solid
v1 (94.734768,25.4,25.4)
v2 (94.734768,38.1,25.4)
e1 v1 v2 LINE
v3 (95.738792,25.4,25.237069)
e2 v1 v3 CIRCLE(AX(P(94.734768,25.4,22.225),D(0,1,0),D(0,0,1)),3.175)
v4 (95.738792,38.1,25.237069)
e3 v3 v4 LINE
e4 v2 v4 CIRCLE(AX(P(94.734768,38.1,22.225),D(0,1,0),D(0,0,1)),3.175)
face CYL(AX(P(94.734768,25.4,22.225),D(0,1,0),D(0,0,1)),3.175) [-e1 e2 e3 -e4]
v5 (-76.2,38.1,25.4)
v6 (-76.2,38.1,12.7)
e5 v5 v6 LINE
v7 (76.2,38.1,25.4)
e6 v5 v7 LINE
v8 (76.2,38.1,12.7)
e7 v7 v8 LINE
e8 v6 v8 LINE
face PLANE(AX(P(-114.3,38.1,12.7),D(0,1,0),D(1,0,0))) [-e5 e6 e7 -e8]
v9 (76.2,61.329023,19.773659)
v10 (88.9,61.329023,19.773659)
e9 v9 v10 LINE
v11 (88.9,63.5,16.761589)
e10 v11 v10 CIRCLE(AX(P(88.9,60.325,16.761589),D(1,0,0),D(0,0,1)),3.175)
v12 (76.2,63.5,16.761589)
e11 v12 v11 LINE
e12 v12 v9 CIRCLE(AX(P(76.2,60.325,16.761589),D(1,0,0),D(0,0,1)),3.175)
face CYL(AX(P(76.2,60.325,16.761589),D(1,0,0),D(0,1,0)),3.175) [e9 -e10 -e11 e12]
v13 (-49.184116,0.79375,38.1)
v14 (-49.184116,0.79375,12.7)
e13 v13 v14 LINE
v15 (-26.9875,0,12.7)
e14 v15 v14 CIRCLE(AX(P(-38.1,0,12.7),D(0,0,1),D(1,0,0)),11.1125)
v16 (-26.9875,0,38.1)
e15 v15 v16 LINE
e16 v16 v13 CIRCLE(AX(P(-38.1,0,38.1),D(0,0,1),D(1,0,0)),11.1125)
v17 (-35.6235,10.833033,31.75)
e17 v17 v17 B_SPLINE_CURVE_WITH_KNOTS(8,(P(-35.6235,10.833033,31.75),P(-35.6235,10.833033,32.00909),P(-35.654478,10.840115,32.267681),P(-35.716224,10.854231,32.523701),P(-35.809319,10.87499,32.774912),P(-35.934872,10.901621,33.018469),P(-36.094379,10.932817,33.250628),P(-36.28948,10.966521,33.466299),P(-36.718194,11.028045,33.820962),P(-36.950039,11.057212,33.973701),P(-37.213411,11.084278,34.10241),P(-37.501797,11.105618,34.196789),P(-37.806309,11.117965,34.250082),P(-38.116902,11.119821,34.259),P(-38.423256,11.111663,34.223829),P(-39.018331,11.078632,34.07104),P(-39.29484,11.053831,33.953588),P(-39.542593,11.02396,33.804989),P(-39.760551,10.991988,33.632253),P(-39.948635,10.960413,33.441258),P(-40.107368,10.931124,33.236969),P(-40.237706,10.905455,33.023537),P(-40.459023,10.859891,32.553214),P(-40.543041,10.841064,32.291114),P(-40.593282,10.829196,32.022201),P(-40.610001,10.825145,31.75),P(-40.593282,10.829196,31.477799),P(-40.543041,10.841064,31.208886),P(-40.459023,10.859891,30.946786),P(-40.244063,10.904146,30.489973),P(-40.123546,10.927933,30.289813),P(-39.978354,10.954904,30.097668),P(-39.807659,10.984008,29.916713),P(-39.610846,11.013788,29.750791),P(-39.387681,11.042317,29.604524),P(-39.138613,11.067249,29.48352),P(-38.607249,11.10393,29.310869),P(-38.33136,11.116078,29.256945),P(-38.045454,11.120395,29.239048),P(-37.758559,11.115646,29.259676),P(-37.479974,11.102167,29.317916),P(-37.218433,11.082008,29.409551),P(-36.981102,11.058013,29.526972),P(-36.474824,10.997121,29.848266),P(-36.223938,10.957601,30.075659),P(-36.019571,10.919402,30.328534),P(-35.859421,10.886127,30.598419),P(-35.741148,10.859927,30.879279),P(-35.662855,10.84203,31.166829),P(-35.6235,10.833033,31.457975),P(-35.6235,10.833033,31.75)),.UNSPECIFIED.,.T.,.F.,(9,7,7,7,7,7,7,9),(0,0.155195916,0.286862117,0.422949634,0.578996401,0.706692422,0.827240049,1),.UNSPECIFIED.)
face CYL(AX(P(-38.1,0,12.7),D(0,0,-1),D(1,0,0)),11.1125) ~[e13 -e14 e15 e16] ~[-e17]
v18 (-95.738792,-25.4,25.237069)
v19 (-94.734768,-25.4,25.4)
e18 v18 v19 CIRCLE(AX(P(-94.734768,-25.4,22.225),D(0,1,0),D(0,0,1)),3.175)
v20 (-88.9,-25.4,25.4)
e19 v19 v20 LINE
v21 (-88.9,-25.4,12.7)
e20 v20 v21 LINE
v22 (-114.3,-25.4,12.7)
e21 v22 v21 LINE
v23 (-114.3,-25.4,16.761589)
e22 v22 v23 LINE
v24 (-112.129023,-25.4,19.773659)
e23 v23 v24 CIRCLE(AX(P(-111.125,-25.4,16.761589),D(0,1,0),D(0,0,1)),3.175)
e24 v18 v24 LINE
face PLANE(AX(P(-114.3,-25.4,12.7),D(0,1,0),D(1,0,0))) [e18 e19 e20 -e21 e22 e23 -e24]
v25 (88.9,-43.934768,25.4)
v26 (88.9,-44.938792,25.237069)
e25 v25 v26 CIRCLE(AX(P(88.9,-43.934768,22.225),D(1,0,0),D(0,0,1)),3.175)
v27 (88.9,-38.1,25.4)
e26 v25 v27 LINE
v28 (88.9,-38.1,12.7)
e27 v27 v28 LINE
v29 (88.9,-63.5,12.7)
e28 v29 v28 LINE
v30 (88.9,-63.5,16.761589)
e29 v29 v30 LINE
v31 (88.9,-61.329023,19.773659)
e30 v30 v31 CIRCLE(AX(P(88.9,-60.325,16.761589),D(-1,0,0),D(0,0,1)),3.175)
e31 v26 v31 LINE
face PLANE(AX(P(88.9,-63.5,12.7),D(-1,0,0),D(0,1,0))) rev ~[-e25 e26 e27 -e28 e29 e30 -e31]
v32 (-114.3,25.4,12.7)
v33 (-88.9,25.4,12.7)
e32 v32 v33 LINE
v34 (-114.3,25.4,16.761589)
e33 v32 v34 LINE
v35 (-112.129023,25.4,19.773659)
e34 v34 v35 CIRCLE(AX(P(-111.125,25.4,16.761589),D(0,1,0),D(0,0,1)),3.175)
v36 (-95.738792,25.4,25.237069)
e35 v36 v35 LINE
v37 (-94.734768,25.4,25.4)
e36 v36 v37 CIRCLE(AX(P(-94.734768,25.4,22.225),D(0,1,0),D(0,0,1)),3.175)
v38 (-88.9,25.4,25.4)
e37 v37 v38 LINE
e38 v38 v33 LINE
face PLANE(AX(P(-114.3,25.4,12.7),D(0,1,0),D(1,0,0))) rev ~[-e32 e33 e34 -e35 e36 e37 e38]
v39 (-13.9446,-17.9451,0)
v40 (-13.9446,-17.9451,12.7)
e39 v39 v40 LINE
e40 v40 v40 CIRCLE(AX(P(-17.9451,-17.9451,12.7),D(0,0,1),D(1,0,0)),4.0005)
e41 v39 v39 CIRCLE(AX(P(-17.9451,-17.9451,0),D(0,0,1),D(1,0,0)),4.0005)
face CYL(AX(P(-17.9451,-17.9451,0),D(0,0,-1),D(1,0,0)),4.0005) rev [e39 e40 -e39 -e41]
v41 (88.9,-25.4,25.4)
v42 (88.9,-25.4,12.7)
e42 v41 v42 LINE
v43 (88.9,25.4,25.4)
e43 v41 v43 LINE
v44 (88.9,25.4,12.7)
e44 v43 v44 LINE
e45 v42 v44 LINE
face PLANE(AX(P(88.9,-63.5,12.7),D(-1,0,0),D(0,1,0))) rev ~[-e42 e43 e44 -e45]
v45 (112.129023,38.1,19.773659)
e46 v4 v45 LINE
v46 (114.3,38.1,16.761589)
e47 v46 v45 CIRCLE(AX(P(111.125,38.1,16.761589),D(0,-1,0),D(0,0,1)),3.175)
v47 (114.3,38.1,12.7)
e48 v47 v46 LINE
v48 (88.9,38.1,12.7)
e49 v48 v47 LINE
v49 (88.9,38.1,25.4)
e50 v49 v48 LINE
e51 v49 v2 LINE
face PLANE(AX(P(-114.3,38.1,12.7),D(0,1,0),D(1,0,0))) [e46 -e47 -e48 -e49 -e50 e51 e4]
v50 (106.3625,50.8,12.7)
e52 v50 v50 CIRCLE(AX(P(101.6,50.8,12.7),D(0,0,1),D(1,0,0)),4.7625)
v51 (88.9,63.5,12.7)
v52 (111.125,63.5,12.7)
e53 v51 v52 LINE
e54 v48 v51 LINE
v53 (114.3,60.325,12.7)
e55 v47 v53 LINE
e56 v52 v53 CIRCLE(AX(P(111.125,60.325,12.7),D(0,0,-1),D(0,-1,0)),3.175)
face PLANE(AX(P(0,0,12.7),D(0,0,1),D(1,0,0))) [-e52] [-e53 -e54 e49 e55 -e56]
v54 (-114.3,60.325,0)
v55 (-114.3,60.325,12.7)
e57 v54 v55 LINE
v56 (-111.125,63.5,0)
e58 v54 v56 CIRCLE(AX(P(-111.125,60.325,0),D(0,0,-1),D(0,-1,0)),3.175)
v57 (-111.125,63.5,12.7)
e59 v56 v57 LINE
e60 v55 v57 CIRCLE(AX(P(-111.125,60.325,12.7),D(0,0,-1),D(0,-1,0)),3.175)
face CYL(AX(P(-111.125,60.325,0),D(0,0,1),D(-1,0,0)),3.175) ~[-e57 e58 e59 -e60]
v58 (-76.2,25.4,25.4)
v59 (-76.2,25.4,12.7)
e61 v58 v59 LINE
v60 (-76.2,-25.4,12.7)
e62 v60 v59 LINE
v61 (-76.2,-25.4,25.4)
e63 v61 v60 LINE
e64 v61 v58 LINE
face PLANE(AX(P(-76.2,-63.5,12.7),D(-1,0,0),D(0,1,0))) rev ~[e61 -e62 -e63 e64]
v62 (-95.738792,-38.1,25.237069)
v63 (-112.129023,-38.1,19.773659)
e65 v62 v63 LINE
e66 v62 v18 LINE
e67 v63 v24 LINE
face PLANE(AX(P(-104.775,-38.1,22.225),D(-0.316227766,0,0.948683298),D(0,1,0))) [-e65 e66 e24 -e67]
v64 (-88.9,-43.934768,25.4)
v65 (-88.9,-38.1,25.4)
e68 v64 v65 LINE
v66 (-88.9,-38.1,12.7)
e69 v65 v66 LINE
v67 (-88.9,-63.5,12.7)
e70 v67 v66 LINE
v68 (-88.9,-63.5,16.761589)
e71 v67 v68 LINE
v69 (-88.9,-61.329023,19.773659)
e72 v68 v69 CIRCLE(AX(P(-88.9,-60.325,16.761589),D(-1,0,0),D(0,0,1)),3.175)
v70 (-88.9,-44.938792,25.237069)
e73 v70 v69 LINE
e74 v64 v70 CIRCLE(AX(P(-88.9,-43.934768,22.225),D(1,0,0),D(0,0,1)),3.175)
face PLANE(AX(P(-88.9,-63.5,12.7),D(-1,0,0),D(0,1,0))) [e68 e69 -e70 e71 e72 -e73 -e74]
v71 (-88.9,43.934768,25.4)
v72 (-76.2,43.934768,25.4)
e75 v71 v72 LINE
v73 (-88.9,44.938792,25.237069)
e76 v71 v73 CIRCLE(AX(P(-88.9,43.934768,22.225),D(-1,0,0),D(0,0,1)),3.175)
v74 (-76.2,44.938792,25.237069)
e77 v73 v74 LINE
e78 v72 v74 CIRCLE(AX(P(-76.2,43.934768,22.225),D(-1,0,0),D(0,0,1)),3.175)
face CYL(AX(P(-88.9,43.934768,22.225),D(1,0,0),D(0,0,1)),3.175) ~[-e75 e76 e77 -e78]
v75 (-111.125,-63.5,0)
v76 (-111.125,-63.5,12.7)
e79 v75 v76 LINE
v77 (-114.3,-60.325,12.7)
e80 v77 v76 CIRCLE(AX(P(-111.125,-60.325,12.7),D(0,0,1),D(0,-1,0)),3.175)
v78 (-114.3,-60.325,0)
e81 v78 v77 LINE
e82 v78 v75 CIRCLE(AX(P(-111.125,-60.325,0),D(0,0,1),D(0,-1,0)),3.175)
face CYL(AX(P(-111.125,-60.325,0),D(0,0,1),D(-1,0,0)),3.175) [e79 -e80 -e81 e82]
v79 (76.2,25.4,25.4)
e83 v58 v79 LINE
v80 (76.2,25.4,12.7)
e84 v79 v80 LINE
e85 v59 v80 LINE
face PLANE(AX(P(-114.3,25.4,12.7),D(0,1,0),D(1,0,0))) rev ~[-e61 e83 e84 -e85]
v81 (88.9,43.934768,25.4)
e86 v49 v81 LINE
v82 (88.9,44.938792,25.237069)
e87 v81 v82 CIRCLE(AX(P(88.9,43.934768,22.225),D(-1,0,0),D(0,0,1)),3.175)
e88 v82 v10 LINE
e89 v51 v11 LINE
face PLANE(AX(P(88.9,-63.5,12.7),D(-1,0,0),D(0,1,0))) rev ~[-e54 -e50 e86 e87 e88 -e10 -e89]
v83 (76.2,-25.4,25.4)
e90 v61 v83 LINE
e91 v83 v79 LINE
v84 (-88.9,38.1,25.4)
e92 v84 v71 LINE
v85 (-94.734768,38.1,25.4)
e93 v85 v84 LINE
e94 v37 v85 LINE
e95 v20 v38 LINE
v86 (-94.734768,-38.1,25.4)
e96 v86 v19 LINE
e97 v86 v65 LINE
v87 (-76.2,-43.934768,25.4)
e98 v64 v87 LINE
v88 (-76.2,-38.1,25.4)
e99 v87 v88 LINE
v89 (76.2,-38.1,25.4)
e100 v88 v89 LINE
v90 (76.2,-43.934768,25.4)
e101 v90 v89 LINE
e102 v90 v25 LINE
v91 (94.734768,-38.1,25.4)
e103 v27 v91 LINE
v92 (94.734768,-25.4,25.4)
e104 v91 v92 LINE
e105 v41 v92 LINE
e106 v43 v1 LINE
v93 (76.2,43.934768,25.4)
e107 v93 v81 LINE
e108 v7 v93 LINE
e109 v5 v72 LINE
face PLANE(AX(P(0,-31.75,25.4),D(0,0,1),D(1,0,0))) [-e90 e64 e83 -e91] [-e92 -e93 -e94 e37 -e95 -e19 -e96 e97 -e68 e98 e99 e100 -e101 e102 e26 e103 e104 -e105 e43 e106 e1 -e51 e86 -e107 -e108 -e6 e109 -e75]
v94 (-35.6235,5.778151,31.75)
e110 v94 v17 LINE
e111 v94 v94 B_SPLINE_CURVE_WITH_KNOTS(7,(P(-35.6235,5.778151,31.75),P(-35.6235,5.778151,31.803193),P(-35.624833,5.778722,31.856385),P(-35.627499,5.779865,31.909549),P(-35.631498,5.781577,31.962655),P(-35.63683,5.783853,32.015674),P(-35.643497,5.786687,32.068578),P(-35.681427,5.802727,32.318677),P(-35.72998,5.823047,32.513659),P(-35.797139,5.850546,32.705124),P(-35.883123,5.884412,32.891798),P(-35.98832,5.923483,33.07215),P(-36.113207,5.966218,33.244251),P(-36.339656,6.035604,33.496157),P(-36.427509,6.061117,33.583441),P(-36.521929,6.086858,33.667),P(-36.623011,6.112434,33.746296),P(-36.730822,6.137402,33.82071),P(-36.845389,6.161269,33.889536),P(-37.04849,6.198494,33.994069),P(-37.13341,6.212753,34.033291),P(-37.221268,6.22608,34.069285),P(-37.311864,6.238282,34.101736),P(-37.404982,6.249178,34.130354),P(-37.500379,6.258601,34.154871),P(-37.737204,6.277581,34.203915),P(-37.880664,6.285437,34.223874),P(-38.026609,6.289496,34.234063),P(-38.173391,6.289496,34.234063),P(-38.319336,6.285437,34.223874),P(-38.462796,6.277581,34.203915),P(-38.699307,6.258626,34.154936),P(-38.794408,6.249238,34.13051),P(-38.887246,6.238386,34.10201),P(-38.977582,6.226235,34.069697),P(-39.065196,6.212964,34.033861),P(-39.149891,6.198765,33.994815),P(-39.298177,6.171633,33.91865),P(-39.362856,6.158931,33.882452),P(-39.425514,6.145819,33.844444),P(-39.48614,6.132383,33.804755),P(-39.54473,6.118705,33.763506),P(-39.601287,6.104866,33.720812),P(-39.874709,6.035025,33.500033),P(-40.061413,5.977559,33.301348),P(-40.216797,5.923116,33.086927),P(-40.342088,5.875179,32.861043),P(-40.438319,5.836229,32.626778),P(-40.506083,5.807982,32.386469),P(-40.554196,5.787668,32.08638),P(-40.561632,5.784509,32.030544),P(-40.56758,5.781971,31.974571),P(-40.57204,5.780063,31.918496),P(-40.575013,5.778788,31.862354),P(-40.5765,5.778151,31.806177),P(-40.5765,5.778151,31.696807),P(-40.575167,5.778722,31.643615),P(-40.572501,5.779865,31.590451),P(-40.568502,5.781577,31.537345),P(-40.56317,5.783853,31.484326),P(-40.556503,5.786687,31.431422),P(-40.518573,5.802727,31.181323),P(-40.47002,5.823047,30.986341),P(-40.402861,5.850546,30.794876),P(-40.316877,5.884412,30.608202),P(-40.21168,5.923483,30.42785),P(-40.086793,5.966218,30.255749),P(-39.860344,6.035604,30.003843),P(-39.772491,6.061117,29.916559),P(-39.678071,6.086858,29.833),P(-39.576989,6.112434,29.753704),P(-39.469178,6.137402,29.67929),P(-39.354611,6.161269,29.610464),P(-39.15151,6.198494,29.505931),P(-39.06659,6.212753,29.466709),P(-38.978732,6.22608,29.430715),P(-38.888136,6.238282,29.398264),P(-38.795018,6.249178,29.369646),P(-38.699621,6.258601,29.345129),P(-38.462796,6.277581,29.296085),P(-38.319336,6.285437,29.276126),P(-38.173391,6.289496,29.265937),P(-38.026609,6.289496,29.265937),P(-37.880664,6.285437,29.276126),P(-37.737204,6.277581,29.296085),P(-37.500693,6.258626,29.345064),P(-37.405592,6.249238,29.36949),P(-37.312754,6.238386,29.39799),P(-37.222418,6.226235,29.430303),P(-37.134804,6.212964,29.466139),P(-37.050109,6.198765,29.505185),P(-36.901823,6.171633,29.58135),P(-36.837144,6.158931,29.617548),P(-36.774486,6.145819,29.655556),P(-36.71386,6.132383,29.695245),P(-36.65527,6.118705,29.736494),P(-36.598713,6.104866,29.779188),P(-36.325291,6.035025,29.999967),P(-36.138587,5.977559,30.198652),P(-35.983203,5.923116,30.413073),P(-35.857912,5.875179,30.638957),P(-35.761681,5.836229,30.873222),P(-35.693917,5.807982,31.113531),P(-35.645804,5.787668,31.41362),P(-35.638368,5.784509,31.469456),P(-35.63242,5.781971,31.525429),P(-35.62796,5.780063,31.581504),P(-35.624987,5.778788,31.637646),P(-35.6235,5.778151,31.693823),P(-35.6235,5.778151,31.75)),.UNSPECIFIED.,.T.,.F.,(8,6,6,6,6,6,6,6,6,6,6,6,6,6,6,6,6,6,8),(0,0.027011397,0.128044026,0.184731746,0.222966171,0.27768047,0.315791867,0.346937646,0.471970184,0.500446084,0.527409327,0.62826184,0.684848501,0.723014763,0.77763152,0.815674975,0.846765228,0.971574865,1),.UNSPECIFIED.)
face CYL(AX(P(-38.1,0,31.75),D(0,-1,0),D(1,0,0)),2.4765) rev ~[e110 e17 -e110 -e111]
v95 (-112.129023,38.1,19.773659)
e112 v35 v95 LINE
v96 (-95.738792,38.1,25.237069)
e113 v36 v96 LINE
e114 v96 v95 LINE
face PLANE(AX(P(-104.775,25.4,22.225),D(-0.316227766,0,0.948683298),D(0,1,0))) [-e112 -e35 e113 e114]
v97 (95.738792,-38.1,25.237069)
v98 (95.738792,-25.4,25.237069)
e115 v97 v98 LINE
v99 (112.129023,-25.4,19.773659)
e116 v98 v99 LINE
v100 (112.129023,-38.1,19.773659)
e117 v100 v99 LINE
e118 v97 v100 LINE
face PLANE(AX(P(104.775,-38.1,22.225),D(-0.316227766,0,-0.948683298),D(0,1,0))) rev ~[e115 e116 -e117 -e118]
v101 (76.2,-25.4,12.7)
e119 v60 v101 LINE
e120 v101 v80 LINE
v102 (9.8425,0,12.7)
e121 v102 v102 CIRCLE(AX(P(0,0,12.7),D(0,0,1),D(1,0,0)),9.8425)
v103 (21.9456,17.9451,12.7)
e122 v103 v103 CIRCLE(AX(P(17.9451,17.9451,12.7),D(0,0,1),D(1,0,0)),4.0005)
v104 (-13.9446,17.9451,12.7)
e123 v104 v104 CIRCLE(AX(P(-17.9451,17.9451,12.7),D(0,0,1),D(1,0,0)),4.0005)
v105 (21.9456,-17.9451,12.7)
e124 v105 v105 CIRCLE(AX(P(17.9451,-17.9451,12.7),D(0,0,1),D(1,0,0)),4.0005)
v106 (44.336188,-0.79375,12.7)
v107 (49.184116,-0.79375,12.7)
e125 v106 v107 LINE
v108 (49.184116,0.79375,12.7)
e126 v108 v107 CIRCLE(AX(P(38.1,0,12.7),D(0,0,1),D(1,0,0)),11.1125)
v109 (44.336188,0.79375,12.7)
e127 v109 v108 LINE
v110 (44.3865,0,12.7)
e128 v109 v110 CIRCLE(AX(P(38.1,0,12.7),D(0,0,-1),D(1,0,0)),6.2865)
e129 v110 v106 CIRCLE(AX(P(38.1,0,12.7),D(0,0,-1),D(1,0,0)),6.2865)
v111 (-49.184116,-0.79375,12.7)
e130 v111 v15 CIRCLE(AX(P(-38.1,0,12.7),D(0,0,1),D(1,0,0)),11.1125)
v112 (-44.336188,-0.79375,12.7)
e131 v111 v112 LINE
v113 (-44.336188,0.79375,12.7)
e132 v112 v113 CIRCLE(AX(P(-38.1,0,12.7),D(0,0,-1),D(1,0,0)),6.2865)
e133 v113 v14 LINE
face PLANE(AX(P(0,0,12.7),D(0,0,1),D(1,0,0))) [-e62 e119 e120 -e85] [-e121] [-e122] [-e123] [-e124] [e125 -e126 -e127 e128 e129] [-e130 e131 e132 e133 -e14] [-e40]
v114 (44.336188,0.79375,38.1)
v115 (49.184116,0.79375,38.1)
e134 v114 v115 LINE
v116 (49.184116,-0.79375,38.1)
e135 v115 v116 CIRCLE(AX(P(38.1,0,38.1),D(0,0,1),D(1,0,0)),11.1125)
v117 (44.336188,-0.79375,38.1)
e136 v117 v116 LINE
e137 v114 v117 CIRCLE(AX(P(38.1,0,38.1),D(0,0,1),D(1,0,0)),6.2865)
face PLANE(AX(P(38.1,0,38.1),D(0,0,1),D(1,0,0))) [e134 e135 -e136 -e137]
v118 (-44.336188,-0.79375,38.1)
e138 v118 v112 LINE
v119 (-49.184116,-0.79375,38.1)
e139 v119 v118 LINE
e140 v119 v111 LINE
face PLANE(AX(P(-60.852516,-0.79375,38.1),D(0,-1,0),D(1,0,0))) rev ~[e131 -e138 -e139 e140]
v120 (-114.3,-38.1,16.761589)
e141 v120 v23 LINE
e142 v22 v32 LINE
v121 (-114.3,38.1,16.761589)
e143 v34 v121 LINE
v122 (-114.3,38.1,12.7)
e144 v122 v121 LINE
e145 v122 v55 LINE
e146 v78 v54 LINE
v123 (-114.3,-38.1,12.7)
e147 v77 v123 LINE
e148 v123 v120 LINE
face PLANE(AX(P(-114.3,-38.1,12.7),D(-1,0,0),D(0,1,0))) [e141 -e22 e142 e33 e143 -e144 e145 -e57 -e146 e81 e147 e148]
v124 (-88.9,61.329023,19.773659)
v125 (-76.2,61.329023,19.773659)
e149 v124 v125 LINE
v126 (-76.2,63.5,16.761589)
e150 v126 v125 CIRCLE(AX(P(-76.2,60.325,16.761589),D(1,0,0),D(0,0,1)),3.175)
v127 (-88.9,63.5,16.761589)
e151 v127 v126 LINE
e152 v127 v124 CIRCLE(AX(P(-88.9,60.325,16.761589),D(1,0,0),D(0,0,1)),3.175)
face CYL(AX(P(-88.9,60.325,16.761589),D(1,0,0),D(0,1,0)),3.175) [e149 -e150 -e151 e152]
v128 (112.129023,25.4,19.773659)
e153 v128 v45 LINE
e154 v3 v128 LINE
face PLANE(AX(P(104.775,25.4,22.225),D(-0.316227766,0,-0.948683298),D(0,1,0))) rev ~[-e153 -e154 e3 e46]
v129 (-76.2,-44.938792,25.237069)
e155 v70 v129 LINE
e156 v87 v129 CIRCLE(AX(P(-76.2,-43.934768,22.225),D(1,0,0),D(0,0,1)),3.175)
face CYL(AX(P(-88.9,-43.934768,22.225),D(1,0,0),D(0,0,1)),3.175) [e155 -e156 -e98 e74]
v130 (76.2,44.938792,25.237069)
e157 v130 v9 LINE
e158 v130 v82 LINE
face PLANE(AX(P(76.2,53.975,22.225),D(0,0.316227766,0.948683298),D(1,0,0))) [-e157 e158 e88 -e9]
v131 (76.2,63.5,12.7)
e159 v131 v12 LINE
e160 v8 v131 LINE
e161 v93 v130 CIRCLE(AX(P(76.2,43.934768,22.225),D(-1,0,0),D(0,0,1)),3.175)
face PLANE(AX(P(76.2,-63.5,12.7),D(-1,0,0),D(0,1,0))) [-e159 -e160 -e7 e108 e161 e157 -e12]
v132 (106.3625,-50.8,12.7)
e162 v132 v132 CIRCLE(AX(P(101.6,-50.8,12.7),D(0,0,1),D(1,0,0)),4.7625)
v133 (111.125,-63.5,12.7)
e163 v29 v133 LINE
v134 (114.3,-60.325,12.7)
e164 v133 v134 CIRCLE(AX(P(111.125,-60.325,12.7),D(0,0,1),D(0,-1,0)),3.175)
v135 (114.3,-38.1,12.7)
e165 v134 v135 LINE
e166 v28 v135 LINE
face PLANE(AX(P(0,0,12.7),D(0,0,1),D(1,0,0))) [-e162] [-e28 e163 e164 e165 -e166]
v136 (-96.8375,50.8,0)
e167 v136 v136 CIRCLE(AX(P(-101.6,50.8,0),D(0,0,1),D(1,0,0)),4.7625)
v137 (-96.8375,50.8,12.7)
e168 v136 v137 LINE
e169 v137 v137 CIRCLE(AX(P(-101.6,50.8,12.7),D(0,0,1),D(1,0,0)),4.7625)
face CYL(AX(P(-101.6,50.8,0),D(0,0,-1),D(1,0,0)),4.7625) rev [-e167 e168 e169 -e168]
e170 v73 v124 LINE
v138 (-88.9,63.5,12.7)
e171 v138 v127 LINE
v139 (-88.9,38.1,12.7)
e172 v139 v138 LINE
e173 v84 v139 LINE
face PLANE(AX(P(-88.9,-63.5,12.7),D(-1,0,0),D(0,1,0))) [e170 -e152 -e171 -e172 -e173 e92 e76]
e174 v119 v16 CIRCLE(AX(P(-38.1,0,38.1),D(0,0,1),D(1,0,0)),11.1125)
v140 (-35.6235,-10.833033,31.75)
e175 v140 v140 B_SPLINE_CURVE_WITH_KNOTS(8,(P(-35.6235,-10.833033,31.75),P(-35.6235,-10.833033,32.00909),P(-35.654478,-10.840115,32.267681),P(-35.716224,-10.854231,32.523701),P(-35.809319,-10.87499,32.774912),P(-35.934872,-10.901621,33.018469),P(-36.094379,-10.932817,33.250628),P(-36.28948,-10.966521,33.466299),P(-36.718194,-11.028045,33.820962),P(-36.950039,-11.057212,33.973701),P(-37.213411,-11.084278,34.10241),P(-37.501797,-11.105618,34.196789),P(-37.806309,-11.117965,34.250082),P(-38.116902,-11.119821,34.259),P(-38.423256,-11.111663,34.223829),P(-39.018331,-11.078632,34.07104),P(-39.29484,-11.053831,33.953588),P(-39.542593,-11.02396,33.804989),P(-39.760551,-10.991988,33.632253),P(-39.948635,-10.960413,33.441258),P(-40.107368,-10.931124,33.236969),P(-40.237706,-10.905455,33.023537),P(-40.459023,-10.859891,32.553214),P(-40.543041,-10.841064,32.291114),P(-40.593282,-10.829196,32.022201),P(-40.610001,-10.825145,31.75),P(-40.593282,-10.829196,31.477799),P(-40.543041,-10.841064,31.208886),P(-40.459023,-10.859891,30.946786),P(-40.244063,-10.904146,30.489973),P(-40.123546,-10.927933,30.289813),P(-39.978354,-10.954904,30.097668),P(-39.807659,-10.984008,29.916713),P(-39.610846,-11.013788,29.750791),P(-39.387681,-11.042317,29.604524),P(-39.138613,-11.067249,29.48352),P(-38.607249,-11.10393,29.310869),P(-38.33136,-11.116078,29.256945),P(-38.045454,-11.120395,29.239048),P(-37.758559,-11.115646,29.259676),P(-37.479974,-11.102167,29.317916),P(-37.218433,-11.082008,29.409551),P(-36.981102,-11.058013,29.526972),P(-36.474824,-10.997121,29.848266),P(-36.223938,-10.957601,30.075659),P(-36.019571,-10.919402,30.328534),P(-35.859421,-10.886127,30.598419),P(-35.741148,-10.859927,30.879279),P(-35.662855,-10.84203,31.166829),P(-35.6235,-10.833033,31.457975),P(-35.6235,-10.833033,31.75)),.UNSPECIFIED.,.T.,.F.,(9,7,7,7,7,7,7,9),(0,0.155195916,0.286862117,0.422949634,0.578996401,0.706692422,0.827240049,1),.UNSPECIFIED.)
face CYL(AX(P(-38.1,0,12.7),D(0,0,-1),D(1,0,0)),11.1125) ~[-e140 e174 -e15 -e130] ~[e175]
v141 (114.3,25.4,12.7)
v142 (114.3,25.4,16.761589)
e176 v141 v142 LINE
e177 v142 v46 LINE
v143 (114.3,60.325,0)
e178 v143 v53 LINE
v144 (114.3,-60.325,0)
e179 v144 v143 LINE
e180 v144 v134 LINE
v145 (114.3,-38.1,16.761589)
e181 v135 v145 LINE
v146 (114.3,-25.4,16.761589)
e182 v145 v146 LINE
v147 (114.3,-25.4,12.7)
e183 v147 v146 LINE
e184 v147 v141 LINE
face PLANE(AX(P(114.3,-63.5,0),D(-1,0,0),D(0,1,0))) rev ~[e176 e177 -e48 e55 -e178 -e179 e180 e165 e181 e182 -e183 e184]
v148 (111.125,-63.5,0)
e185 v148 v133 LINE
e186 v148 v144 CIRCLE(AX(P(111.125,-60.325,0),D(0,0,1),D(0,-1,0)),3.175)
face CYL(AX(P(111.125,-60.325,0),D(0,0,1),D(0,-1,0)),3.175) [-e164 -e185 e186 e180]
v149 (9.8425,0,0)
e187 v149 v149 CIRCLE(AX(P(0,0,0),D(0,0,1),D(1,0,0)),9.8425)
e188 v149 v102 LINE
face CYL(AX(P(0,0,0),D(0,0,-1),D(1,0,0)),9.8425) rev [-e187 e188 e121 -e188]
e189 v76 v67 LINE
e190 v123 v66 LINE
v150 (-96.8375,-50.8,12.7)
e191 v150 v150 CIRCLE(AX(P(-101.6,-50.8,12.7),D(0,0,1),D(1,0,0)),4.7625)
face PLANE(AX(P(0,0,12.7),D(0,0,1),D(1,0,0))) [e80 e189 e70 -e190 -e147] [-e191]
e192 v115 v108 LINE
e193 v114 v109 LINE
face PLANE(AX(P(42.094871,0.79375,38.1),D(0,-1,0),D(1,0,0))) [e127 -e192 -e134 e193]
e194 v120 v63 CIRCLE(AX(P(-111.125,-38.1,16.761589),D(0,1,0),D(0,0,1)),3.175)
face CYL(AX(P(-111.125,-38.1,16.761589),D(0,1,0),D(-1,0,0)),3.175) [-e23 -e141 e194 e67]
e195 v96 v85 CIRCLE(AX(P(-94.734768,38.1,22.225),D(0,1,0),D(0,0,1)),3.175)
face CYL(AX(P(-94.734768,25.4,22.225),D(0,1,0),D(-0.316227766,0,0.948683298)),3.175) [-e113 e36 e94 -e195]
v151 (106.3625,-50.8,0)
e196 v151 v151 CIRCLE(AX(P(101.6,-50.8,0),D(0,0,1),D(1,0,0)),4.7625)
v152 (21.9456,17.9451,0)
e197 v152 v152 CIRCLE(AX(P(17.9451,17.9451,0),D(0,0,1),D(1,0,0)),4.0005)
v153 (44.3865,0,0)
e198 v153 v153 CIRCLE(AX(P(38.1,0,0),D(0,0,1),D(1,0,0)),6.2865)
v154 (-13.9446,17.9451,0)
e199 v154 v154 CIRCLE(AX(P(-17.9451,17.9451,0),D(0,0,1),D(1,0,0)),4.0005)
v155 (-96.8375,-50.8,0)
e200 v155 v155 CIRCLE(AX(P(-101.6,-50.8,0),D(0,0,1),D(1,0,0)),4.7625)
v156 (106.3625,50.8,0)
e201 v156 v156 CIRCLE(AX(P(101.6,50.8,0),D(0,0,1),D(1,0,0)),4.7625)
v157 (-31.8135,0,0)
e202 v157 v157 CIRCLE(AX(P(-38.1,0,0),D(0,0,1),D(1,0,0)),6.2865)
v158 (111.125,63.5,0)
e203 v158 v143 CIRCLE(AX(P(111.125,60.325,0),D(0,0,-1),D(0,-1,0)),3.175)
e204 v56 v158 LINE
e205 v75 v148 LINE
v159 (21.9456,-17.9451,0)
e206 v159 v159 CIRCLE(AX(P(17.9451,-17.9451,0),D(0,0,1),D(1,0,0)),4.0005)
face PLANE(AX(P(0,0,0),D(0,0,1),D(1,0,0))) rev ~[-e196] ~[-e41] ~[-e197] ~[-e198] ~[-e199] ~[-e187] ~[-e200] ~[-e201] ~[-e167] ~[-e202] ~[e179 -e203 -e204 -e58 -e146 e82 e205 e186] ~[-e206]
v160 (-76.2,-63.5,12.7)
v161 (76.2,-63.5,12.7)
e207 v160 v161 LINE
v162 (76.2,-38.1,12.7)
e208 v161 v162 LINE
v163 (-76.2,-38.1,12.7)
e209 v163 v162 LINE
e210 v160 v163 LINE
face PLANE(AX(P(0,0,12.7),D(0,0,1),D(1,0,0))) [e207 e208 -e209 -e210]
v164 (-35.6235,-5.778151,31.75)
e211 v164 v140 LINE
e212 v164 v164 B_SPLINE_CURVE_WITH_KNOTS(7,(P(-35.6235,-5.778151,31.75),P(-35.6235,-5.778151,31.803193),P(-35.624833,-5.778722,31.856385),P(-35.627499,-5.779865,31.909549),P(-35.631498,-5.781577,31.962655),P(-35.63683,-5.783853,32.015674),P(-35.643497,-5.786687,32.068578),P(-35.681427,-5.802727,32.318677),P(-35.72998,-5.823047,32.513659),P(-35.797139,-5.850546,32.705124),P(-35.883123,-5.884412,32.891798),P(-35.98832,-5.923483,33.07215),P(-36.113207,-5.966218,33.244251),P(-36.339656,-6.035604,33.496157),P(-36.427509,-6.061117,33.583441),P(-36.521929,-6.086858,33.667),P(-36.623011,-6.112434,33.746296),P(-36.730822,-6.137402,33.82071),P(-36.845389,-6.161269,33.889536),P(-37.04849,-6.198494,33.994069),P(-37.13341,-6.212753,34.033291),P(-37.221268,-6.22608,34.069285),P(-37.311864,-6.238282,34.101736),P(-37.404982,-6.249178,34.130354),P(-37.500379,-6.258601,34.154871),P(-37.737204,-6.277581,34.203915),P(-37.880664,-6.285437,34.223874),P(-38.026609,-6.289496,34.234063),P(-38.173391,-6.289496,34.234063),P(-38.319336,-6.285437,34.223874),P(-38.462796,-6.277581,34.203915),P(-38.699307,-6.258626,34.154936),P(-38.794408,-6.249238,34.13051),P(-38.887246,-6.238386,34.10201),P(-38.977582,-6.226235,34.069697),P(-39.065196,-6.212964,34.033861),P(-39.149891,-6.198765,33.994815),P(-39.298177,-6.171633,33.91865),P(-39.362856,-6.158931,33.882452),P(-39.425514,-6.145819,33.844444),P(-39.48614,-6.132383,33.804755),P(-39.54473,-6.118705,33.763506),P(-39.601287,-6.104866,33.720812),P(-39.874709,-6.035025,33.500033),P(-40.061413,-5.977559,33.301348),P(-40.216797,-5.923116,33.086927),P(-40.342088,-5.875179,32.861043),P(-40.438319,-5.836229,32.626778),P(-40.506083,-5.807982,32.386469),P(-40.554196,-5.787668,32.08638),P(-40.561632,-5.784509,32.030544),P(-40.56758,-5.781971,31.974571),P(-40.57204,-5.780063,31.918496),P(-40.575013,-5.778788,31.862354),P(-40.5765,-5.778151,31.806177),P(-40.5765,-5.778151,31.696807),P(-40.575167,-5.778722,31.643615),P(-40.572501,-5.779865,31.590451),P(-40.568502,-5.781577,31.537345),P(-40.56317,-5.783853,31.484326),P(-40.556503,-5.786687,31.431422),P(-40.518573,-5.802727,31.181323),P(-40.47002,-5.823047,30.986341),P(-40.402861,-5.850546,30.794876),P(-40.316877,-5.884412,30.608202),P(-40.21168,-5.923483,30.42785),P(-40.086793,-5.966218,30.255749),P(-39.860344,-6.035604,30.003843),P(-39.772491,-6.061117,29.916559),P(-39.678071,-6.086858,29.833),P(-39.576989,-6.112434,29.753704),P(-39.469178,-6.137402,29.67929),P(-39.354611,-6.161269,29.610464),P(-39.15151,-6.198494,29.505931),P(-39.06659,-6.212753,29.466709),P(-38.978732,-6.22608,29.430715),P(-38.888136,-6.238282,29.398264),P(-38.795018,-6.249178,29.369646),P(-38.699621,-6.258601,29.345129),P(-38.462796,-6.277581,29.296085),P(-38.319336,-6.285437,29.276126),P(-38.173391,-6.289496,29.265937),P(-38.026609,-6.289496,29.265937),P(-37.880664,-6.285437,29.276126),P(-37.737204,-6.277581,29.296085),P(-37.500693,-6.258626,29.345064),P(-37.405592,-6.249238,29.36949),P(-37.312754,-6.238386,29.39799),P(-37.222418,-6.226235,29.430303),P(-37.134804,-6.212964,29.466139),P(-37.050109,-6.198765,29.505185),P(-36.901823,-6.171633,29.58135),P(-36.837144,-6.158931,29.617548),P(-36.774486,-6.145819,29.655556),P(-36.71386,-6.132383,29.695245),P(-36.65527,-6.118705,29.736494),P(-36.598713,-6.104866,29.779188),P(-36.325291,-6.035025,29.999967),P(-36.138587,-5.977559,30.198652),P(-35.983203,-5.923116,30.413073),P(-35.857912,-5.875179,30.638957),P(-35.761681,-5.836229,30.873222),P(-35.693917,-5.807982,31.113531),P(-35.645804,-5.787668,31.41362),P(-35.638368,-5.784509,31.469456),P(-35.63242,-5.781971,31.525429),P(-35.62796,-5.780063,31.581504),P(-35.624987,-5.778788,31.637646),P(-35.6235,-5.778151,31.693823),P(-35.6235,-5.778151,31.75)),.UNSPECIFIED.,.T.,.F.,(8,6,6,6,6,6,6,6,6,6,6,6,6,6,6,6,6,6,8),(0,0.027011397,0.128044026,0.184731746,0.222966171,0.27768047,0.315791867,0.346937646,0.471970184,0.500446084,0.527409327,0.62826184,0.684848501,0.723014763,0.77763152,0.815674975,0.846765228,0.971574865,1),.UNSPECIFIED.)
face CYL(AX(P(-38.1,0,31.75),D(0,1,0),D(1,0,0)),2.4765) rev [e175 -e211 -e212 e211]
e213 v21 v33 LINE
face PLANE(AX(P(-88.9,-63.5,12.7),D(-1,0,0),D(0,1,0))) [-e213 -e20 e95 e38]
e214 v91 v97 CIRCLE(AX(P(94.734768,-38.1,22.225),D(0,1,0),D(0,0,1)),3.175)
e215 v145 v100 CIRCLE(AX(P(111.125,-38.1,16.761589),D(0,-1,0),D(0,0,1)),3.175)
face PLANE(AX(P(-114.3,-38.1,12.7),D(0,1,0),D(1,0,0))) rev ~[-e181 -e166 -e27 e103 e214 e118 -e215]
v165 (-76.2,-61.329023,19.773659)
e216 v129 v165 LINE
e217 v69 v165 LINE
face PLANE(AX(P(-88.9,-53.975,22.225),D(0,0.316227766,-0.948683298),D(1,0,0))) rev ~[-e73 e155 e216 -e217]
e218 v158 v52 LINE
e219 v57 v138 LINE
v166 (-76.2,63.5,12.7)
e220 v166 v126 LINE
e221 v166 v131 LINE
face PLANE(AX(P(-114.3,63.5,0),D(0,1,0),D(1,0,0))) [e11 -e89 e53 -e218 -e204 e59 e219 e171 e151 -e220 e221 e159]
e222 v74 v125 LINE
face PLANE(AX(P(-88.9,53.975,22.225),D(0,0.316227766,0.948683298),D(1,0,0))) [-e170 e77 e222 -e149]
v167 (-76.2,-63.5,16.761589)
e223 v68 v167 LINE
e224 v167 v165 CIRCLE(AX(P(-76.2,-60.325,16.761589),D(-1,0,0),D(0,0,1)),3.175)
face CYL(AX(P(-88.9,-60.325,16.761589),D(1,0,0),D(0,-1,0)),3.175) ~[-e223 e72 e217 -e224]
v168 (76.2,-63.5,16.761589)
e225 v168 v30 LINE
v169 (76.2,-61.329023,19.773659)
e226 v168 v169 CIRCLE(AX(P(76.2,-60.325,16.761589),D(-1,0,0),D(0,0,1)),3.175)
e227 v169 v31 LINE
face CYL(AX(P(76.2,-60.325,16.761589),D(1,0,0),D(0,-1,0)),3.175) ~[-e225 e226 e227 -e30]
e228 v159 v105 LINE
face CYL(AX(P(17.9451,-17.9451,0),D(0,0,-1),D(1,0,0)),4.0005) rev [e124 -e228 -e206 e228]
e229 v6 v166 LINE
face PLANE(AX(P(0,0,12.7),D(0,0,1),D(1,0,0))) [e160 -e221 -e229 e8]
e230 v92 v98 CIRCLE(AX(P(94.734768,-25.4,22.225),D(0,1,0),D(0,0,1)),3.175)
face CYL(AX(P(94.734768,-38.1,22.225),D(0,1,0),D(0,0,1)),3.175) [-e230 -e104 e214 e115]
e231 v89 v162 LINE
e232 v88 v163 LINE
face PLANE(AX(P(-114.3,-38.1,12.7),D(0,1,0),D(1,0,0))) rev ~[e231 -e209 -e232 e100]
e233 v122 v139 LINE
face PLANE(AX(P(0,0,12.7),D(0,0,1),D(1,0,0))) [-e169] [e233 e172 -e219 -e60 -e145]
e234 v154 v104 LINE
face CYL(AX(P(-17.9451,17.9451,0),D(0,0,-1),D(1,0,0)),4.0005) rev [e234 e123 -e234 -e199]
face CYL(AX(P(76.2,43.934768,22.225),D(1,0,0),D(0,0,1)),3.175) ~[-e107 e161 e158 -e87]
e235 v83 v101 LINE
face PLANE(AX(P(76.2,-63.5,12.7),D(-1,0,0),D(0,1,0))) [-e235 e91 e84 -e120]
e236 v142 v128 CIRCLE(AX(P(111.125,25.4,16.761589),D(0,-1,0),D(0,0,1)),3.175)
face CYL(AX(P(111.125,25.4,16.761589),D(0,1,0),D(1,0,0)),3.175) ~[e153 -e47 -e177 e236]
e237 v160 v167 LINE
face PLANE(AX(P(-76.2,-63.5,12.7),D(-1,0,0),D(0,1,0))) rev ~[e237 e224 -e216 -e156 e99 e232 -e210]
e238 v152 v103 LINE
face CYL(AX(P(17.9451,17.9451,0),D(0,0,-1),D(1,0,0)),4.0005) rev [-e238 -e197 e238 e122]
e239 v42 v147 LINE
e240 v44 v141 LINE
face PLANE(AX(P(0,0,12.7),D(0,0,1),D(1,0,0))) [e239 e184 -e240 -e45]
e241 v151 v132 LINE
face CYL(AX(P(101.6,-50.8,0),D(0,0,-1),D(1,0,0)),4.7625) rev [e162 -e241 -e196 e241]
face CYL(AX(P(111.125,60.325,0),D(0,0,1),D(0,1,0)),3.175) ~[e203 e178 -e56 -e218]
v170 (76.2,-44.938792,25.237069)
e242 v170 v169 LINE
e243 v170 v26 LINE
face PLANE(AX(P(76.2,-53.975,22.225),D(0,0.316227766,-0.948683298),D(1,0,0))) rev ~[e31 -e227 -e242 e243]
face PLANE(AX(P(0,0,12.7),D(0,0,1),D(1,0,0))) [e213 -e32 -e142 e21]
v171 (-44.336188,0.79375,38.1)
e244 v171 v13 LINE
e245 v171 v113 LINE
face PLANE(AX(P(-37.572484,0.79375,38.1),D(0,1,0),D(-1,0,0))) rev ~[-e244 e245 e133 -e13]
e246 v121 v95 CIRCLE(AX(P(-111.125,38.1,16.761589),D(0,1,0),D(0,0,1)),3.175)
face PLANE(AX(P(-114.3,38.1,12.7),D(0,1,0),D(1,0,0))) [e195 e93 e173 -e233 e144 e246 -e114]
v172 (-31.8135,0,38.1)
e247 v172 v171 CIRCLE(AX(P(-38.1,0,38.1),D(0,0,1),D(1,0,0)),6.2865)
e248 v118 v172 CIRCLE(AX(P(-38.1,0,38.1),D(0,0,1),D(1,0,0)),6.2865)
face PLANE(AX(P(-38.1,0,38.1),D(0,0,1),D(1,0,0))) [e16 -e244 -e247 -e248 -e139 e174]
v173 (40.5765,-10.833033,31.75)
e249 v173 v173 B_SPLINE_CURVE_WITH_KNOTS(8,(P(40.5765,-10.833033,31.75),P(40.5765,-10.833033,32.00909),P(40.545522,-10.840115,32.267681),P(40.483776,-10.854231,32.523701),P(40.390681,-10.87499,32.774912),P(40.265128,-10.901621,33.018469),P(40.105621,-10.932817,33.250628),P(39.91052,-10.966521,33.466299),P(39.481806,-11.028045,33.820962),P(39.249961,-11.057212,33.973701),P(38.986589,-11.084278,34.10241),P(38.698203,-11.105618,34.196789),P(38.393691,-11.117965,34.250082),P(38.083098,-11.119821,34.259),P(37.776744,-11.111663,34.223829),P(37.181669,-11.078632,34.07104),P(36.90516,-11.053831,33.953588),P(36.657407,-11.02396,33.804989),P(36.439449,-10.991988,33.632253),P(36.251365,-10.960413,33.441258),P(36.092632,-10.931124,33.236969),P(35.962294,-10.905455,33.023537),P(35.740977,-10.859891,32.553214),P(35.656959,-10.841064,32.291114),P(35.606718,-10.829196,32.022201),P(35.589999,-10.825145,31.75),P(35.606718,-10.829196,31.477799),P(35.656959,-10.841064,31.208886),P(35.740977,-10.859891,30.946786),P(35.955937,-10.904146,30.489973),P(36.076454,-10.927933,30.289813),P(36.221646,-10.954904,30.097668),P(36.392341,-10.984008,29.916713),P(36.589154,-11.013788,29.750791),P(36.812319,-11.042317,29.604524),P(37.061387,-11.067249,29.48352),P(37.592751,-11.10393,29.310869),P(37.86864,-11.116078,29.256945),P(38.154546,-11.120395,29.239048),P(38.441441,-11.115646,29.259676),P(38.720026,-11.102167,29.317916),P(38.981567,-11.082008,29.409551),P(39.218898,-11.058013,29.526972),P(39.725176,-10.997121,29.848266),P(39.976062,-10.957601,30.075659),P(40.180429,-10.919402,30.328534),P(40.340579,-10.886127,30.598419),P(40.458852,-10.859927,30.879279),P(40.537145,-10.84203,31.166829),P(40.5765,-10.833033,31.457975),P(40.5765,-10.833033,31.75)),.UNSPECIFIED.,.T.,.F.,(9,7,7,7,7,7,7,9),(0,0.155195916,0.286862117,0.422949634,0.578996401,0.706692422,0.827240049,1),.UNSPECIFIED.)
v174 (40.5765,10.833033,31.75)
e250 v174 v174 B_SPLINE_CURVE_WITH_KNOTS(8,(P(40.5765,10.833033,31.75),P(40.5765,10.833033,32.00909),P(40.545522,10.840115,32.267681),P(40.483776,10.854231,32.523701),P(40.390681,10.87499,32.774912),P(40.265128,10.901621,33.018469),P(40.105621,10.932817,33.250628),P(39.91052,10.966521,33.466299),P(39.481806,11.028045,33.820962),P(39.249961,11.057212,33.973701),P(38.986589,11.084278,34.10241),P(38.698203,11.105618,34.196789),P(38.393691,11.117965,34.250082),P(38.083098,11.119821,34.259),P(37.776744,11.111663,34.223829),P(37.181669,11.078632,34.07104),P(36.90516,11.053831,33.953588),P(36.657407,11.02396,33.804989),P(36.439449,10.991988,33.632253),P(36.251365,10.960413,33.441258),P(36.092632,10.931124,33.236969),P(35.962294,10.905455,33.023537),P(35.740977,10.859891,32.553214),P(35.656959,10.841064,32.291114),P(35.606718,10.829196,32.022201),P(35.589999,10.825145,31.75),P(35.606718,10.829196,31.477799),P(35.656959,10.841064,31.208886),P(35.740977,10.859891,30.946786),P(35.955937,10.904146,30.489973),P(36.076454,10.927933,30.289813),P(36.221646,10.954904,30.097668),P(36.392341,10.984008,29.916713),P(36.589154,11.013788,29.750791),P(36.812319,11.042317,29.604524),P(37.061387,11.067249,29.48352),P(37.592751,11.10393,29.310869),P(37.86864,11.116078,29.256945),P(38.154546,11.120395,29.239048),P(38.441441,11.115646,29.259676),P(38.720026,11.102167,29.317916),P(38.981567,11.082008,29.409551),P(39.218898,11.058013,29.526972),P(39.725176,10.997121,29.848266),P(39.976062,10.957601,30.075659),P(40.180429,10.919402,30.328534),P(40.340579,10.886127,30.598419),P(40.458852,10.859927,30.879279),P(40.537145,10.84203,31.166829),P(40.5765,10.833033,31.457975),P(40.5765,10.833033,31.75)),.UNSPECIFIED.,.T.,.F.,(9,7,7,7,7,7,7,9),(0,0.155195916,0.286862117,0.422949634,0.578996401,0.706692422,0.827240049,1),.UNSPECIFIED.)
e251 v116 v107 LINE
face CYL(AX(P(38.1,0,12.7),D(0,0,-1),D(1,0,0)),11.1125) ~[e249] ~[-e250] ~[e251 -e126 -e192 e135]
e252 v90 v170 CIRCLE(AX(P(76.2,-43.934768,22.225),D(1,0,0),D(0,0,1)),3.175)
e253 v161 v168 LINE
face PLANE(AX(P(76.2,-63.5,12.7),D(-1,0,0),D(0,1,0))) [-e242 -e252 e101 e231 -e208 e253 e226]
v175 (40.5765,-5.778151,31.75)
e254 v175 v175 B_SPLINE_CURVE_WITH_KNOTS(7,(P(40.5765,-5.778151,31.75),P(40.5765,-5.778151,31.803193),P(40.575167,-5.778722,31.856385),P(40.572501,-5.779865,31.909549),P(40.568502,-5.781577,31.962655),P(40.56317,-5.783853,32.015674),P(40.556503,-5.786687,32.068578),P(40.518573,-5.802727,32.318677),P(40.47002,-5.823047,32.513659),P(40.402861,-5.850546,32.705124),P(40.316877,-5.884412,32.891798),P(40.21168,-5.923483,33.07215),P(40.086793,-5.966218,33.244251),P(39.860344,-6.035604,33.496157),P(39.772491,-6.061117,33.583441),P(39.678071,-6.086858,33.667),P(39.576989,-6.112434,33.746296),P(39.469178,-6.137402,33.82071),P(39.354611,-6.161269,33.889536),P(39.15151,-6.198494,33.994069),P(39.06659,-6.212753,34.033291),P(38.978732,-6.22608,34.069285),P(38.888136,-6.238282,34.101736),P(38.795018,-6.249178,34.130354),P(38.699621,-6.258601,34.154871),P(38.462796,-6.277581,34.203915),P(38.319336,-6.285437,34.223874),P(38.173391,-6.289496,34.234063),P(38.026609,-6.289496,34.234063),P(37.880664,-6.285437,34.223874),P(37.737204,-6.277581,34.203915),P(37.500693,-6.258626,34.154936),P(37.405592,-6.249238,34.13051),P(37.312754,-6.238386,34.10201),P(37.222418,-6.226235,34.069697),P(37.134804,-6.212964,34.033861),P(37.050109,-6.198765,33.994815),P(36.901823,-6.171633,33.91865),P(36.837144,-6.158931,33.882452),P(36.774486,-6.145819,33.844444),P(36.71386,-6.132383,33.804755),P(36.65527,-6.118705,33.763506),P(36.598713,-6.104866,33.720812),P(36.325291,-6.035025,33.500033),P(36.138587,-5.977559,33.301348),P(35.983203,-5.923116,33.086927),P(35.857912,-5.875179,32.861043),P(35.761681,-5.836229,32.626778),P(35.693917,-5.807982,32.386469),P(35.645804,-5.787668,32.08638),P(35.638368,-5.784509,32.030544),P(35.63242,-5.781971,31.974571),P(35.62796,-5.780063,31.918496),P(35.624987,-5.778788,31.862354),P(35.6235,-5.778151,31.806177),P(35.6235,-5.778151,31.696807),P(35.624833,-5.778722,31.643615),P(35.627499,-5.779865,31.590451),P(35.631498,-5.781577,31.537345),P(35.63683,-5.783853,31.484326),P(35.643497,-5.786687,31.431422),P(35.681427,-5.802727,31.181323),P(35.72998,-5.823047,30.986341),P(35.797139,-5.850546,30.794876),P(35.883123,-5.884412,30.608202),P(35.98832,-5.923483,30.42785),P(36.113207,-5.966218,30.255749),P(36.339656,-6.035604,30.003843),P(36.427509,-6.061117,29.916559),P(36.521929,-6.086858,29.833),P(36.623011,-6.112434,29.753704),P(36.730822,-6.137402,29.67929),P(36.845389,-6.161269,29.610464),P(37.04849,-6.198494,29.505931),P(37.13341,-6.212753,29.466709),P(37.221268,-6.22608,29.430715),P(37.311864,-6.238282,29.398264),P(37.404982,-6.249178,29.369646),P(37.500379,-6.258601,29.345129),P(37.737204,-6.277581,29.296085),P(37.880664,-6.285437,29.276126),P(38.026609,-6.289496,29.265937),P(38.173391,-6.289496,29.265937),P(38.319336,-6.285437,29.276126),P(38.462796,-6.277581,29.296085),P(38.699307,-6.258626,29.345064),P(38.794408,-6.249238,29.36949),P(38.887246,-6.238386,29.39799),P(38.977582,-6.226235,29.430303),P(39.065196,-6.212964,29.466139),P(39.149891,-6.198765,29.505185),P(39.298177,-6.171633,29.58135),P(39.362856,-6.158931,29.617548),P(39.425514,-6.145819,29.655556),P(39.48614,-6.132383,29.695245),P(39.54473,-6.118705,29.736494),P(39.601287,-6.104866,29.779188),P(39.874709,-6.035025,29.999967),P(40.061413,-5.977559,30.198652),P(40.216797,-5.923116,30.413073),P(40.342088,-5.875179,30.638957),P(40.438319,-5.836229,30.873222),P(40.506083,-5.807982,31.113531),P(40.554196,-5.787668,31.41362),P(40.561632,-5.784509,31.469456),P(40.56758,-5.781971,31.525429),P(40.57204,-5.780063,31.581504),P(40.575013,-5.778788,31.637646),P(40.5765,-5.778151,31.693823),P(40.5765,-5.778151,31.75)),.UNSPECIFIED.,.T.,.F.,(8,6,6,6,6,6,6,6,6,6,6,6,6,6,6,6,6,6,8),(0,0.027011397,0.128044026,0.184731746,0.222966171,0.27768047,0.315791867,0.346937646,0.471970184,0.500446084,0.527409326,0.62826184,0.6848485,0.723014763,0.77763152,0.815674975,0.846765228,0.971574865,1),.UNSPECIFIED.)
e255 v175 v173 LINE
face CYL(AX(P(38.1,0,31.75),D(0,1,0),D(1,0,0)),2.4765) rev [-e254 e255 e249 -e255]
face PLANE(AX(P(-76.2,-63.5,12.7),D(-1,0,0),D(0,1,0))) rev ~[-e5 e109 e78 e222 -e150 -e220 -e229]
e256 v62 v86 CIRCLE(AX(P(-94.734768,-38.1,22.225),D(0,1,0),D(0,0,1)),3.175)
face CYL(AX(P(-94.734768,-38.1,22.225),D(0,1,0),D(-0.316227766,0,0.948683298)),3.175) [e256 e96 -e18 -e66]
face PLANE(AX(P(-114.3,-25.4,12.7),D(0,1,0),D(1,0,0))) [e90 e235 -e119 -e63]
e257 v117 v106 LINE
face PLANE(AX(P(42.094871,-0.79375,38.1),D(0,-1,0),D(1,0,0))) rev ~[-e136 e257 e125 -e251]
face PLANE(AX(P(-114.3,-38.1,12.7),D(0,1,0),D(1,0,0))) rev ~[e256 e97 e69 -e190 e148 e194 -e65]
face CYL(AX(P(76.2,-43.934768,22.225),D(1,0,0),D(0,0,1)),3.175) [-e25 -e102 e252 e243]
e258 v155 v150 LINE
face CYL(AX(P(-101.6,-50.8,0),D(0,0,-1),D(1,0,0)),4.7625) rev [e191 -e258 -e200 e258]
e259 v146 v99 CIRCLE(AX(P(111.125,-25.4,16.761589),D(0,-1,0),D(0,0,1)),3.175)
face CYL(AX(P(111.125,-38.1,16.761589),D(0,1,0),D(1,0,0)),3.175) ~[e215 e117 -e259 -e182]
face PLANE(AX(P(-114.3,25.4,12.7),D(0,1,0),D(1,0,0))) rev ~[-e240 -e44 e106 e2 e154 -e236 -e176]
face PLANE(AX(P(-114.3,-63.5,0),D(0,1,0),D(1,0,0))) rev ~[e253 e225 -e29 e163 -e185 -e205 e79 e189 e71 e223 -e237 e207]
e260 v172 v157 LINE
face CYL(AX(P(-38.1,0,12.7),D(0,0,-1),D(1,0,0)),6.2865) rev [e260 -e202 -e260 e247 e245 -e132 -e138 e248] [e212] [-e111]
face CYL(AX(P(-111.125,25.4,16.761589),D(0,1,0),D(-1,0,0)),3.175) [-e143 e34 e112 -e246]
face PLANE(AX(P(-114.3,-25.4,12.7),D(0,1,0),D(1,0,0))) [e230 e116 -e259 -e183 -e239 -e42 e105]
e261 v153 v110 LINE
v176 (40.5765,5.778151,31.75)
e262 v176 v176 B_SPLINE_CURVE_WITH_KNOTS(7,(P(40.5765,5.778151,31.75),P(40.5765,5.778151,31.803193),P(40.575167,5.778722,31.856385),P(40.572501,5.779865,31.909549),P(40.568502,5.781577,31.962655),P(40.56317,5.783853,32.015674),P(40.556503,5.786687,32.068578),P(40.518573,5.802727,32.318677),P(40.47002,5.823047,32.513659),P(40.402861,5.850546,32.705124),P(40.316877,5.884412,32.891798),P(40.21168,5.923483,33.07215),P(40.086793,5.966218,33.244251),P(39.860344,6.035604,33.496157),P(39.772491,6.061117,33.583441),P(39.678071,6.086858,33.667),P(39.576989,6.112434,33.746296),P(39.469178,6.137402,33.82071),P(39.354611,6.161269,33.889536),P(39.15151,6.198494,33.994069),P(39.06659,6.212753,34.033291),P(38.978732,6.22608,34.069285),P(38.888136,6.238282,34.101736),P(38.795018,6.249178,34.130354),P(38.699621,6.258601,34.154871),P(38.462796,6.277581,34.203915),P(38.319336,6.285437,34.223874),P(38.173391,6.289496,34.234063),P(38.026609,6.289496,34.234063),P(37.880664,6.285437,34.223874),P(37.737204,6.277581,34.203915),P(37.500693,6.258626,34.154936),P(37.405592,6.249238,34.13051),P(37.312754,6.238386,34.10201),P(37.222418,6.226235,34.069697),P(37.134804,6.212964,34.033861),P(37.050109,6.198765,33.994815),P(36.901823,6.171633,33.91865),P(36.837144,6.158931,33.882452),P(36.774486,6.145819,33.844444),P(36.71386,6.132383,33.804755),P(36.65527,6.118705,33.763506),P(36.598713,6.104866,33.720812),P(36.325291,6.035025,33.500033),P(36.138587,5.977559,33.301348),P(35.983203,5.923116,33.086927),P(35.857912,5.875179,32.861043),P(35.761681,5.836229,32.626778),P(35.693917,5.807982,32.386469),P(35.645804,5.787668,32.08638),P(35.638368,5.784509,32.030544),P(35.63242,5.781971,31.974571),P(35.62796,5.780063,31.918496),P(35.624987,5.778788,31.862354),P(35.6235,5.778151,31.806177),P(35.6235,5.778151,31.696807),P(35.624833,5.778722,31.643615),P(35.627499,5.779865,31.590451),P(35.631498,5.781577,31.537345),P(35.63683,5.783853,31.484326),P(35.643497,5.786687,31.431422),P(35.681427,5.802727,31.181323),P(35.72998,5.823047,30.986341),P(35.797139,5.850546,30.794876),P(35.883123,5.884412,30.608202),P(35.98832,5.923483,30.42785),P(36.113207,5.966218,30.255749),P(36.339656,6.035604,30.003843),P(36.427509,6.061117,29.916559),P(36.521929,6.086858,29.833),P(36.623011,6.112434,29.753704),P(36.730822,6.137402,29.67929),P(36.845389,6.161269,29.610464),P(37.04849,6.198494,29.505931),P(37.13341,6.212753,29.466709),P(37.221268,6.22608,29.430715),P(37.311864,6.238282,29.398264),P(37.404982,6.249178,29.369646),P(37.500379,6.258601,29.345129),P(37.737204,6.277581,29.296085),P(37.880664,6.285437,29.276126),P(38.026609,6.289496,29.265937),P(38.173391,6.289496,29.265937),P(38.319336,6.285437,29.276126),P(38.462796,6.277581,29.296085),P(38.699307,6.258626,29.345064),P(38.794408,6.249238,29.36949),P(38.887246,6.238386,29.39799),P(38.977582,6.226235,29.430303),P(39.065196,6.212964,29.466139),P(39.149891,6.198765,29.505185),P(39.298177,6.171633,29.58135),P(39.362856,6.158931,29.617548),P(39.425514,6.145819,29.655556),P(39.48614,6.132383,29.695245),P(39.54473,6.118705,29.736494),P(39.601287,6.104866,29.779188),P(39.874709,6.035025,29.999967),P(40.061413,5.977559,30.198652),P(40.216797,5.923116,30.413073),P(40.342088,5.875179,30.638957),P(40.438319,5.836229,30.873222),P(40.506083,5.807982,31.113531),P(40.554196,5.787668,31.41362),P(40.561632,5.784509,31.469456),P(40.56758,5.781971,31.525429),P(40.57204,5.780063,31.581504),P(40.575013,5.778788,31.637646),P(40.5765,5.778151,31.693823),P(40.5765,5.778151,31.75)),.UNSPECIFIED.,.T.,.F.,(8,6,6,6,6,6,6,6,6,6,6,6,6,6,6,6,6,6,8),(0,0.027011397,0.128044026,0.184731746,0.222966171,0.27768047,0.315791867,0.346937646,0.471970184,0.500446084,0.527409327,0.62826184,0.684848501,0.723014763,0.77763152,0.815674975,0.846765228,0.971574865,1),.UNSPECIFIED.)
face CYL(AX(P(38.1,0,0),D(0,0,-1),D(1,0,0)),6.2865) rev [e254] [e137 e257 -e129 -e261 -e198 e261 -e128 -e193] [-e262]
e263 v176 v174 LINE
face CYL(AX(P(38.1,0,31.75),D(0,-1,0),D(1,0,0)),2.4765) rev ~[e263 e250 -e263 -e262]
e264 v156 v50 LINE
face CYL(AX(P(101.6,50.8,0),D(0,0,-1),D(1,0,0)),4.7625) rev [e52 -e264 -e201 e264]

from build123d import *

# Parameters (mm, degrees)
F0_W           = 228.6
F0_H           = 127
F0_R           = 4.7625
F0_R_2         = 4.0005
F0_R_3         = 6.2865
F0_R_4         = 9.8425
F1_DEPTH       = 12.7
F2_R           = 11.1125
F2_R_2         = 6.2865
F3_DEPTH       = 25.4
F4_W           = 23.2800319791
F4_H           = 1.5875
F5_DEPTH       = 25.4
F6_W           = 12.7
F6_H           = 127
F7_DEPTH       = 12.7
F8_W           = 228.6
F8_H           = 12.7
F9_DEPTH       = 12.7
F10_R          = 3.175
F11_SIZE2      = 6.35
F11_SIZE       = 19.05
F12_R          = 3.175
F13_R          = 2.4765
F14_DEPTH      = 25.4
F14_DEPTH_BACK = 25.4


with BuildPart() as f1:
    # F0 (on Top) → F1 (new body)
    with BuildSketch(Plane.XY):
        Rectangle(F0_W, F0_H)
        with Locations((-101.6, -50.8)):
            Circle(F0_R, mode=Mode.SUBTRACT)
        with Locations((-17.9451, -17.9451)):
            Circle(F0_R_2, mode=Mode.SUBTRACT)
        with Locations((101.6, -50.8)):
            Circle(F0_R, mode=Mode.SUBTRACT)
        with Locations((17.9451, -17.9451)):
            Circle(F0_R_2, mode=Mode.SUBTRACT)
        with Locations((-38.1, 0)):
            Circle(F0_R_3, mode=Mode.SUBTRACT)
        with Locations((-17.9451, 17.9451)):
            Circle(F0_R_2, mode=Mode.SUBTRACT)
        with Locations((-101.6, 50.8)):
            Circle(F0_R, mode=Mode.SUBTRACT)
        Circle(F0_R_4, mode=Mode.SUBTRACT)
        with Locations((38.1, 0)):
            Circle(F0_R_3, mode=Mode.SUBTRACT)
        with Locations((17.9451, 17.9451)):
            Circle(F0_R_2, mode=Mode.SUBTRACT)
        with Locations((101.6, 50.8)):
            Circle(F0_R, mode=Mode.SUBTRACT)
    extrude(amount=F1_DEPTH)

    # F2 (on face) → F3 (join)
    with BuildSketch(Plane.XY.offset(12.7)):
        with Locations((-38.1, 0)):
            Circle(F2_R)
        with Locations((-38.1, 0)):
            Circle(F2_R_2, mode=Mode.SUBTRACT)
        with Locations((38.1, 0)):
            Circle(F2_R)
        with Locations((38.1, 0)):
            Circle(F2_R_2, mode=Mode.SUBTRACT)
    extrude(amount=F3_DEPTH)

    # F4 (on face) → F5 (cut, through all)
    with BuildSketch(Plane.XY.offset(38.1)):
        with Locations((53.7348873913, 0)):
            Rectangle(F4_W, F4_H)
        with BuildLine():
            Line((-37.5724840105, -0.79375), (-37.5724840105, 0.79375))
            Line((-37.5724840105, 0.79375), (-44.3361881937, 0.79375))
            ThreePointArc((-44.3361881937, 0.79375), (-44.3865, 0), (-44.3361881937, -0.79375))
            Line((-44.3361881937, -0.79375), (-37.5724840105, -0.79375))
        make_face()
        with BuildLine():
            ThreePointArc((-44.3361881937, -0.79375), (-44.3865, 0), (-44.3361881937, 0.79375))
            Line((-44.3361881937, 0.79375), (-49.1841155347, 0.79375))
            ThreePointArc((-49.1841155347, 0.79375), (-49.2125, 0), (-49.1841155347, -0.79375))
            Line((-49.1841155347, -0.79375), (-44.3361881937, -0.79375))
        make_face()
        with BuildLine():
            ThreePointArc((-49.1841155347, -0.79375), (-49.2125, 0), (-49.1841155347, 0.79375))
            Line((-49.1841155347, 0.79375), (-60.8525159895, 0.79375))
            Line((-60.8525159895, 0.79375), (-60.8525159895, -0.79375))
            Line((-60.8525159895, -0.79375), (-49.1841155347, -0.79375))
        make_face()
    extrude(amount=-F5_DEPTH, mode=Mode.SUBTRACT)

    # F6 (on face) → F7 (join)
    with BuildSketch(Plane.XY.offset(12.7)):
        with Locations((-82.55, 0)):
            Rectangle(F6_W, F6_H)
        with Locations((82.55, 0)):
            Rectangle(F6_W, F6_H)
    extrude(amount=F7_DEPTH)

    # F8 (on face) → F9 (join)
    with BuildSketch(Plane.XY.offset(12.7)):
        with Locations((0, -31.75)):
            Rectangle(F8_W, F8_H)
        with Locations((0, 31.75)):
            Rectangle(F8_W, F8_H)
    extrude(amount=F9_DEPTH)

    # F10
    f10_edges = [f1.edges().sort_by_distance(p)[0] for p in [
        (-114.3, -63.5, 6.35),
        (114.3, -63.5, 6.35),
        (-114.3, 63.5, 6.35),
        (114.3, 63.5, 6.35),
    ]]
    fillet(f10_edges, radius=F10_R)

    # F11
    f11_edges = [f1.edges().sort_by_distance(p)[0] for p in [
        (-114.3, 31.75, 25.4),
        (-114.3, -31.75, 25.4),
        (114.3, -31.75, 25.4),
        (114.3, 31.75, 25.4),
        (-82.55, -63.5, 25.4),
        (82.55, -63.5, 25.4),
        (82.55, 63.5, 25.4),
        (-82.55, 63.5, 25.4),
    ]]
    f11_side = f1.faces().sort_by_distance((78.81509, 50.8, 25.4))[0]
    chamfer(f11_edges, length=F11_SIZE, length2=F11_SIZE2, reference=f11_side)

    # F12
    f12_edges = [f1.edges().sort_by_distance(p)[0] for p in [
        (-114.3, -31.75, 19.05),
        (-114.3, 31.75, 19.05),
        (-95.25, 31.75, 25.4),
        (-95.25, -31.75, 25.4),
        (95.25, -31.75, 25.4),
        (114.3, -31.75, 19.05),
        (114.3, 31.75, 19.05),
        (95.25, 31.75, 25.4),
        (-82.55, -63.5, 19.05),
        (82.55, -63.5, 19.05),
        (82.55, -44.45, 25.4),
        (-82.55, -44.45, 25.4),
        (-82.55, 44.45, 25.4),
        (-82.55, 63.5, 19.05),
        (82.55, 44.45, 25.4),
        (82.55, 63.5, 19.05),
    ]]
    fillet(f12_edges, radius=F12_R)

    # F13 (on Front) → F14 (cut, two sides)
    with BuildSketch(Plane.XZ) as f14_sk:
        with Locations((-38.1, 31.75)):
            Circle(F13_R)
        with Locations((38.1, 31.75)):
            Circle(F13_R)
    extrude(amount=-F14_DEPTH, mode=Mode.SUBTRACT)
    extrude(f14_sk.sketch, amount=F14_DEPTH_BACK, mode=Mode.SUBTRACT)


solid = f1.part
